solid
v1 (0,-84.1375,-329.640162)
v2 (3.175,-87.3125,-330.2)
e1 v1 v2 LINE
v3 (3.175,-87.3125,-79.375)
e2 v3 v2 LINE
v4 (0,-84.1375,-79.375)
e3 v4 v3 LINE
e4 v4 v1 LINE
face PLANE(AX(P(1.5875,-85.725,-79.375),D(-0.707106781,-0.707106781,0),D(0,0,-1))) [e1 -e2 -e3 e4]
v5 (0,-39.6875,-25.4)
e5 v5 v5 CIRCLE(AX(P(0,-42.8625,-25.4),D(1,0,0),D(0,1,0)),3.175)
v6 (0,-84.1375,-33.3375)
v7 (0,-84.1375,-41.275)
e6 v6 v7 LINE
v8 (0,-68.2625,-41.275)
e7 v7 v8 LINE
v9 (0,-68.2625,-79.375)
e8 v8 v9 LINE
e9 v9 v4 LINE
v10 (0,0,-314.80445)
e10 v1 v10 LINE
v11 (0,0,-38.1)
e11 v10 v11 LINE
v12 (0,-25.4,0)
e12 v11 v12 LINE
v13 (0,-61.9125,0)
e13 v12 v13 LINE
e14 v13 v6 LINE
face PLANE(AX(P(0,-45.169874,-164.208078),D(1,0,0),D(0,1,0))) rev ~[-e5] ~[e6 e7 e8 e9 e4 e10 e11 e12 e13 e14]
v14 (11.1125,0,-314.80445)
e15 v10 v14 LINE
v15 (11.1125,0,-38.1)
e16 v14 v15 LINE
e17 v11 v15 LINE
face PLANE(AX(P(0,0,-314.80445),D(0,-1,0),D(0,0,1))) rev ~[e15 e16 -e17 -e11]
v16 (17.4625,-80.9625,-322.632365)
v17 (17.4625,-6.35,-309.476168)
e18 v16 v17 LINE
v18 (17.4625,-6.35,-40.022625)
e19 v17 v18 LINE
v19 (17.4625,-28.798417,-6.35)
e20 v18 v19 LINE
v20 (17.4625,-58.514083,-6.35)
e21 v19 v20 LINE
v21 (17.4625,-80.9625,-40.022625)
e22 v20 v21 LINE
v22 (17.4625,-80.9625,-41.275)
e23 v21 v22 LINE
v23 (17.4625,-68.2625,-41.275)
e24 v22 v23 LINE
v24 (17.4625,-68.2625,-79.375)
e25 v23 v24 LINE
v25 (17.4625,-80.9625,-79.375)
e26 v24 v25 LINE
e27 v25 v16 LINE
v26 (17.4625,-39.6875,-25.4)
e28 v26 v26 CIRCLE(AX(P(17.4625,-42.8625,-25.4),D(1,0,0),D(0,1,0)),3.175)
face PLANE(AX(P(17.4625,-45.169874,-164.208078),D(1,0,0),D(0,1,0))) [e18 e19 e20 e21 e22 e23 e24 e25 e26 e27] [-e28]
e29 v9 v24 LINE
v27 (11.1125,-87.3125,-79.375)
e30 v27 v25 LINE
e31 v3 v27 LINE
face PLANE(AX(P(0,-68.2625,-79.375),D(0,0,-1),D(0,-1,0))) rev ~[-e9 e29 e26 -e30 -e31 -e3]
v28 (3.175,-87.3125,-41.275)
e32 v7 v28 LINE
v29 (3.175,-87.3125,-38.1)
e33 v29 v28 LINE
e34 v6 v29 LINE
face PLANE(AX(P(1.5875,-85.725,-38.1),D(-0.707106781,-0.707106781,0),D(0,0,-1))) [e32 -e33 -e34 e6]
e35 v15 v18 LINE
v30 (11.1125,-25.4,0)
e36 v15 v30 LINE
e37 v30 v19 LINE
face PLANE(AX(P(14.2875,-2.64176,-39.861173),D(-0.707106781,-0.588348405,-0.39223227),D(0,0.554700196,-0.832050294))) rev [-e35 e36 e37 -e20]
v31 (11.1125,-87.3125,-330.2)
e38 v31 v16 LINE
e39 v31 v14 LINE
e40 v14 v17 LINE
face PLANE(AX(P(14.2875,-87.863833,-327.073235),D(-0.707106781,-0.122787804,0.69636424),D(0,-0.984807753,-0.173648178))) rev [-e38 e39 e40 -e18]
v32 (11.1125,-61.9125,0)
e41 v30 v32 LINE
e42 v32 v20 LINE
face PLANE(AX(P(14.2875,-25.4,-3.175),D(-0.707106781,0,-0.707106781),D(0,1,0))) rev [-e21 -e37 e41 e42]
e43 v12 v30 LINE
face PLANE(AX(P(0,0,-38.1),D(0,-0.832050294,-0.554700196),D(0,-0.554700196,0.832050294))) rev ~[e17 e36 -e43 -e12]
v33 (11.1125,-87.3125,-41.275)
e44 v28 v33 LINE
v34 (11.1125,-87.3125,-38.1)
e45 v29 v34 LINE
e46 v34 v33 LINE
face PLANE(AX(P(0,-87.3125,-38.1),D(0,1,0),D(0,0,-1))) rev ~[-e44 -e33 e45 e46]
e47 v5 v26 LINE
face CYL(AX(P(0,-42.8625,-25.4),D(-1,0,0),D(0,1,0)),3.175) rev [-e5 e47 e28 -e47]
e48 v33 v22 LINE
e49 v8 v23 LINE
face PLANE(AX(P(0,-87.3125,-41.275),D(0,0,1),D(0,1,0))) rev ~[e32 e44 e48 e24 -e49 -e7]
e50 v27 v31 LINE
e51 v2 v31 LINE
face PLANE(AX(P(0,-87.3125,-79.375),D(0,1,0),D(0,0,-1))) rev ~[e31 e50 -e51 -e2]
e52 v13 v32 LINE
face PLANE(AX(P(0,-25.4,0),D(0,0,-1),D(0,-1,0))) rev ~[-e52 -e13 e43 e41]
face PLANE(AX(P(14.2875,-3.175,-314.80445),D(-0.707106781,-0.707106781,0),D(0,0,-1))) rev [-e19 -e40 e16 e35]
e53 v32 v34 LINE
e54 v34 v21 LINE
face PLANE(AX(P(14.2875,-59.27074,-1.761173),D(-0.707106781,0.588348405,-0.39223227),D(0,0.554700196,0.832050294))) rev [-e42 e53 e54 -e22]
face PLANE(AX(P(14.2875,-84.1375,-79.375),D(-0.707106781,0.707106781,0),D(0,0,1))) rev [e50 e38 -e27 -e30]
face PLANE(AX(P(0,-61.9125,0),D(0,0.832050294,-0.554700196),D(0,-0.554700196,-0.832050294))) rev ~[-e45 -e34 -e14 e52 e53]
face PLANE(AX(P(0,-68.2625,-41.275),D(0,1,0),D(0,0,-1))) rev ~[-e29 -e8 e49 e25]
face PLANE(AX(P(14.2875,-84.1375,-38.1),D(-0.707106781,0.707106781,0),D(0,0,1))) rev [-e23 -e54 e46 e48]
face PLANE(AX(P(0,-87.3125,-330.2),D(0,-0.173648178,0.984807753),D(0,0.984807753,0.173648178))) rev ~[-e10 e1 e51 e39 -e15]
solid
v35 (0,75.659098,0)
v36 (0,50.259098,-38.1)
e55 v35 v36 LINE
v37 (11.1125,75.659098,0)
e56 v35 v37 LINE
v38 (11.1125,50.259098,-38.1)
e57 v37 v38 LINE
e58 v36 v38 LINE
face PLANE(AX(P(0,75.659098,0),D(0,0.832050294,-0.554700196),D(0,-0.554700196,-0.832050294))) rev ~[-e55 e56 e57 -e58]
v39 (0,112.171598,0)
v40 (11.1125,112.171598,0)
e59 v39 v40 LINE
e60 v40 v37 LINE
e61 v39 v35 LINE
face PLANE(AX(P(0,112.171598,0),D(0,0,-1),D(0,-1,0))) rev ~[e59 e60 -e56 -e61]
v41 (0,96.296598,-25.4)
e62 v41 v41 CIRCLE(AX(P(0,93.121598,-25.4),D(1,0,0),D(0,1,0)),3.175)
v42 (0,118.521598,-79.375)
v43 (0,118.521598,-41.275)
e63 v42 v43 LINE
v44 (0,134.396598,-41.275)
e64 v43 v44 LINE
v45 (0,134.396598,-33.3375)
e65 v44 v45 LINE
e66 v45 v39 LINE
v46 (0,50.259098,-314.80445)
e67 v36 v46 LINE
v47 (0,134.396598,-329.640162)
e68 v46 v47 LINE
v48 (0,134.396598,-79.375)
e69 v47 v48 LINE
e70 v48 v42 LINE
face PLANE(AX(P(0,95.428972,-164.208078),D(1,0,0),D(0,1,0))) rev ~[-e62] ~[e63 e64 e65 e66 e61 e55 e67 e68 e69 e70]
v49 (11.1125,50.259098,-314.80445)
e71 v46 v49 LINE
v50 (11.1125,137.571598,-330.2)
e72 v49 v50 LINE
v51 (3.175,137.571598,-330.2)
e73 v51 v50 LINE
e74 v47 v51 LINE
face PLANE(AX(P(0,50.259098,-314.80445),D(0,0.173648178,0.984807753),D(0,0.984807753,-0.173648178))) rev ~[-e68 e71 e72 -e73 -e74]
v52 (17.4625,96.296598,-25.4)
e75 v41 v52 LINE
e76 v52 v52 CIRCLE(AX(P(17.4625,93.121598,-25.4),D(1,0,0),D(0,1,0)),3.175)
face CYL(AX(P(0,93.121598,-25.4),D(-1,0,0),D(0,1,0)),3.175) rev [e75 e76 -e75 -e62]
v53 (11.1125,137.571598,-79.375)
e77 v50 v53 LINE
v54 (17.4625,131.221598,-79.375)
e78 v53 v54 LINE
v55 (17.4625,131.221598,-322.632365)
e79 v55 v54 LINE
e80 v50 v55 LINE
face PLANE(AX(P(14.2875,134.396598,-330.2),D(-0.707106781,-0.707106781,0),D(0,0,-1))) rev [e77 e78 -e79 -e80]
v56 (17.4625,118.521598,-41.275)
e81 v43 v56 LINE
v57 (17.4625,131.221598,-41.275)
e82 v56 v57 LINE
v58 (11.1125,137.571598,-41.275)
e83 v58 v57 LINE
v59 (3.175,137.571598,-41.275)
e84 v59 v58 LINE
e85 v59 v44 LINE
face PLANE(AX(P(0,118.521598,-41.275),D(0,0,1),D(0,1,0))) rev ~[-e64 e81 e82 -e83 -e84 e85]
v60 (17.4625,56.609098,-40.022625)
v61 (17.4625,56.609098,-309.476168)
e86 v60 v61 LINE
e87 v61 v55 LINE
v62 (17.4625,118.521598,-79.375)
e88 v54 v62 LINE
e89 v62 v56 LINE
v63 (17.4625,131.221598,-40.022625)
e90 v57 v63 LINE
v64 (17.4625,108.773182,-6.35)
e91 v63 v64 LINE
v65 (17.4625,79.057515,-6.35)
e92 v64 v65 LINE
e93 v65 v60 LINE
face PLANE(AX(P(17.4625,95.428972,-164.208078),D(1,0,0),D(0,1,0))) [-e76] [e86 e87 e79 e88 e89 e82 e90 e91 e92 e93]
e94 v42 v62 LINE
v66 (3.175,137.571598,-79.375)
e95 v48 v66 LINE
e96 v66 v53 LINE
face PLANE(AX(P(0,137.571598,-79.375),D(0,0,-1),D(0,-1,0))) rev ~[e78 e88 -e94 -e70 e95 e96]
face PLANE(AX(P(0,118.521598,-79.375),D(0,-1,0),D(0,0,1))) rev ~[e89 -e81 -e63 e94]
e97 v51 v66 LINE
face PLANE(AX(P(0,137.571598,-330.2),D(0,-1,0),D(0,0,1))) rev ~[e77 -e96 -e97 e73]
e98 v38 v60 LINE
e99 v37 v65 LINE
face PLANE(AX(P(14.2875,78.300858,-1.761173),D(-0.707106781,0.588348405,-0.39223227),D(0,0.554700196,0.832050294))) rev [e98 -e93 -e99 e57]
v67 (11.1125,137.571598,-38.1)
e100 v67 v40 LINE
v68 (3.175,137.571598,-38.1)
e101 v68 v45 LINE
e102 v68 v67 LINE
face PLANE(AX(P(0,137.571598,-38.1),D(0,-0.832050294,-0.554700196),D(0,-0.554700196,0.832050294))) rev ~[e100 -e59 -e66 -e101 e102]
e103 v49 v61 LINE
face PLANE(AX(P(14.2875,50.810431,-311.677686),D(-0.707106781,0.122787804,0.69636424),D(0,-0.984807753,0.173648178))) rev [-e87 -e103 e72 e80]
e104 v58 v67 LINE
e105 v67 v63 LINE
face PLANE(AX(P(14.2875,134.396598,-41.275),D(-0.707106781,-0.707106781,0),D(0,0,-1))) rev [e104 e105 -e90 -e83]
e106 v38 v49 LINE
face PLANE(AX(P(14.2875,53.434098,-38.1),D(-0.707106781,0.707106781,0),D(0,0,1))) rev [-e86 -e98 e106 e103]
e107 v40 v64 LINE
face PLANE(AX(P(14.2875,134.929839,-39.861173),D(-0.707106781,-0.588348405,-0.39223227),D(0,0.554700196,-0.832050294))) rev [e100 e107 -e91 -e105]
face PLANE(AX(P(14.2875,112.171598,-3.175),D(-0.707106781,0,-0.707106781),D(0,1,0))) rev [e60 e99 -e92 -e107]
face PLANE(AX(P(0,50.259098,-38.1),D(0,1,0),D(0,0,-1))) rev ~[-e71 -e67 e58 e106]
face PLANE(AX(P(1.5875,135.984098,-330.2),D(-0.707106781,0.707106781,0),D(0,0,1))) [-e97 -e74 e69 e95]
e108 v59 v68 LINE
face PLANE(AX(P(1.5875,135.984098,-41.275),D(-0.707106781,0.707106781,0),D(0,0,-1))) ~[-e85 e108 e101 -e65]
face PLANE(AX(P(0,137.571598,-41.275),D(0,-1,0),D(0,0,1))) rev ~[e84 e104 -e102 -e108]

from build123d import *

# Parameters (mm, degrees)
F0_R      = 3.175
F1_DEPTH  = 17.4625
F2_SIZE   = 6.35
F2_2_SIZE = 6.35
F3_SIZE   = 3.175
F3_2_SIZE = 3.175


# Not quite as in the source:
# - a feature names something its author has since deleted; it is built from what else it names


with BuildPart() as f1:
    # F0 (on Right) → F1 (new body)
    with BuildSketch(Plane.YZ):
        Polygon((0, -314.8044504969), (0, -38.1), (-25.4, 0), (-61.9125, 0), (-87.3125, -38.1), (-87.3125, -41.275), (-68.2625, -41.275), (-68.2625, -79.375), (-87.3125, -79.375), (-87.3125, -330.2), align=None)
        with Locations((-42.8625, -25.4)):
            Circle(F0_R, mode=Mode.SUBTRACT)
    extrude(amount=F1_DEPTH)

    # F2
    f2_edges = [f1.edges().sort_by_distance(p)[0] for p in [
        (17.4625, -74.6125, -19.05),
        (17.4625, -43.65625, 0),
        (17.4625, -12.7, -19.05),
        (17.4625, 0, -176.452225),
        (17.4625, -87.3125, -39.6875),
        (17.4625, -43.65625, -322.502225),
        (17.4625, -87.3125, -204.7875),
    ]]
    chamfer(f2_edges, length=F2_SIZE)

    # F3#2
    f3_2_edges = [f1.edges().sort_by_distance(p)[0] for p in [
        (0, -87.3125, -39.6875),
        (0, -87.3125, -204.7875),
    ]]
    chamfer(f3_2_edges, length=F3_2_SIZE)


with BuildPart() as f1b:
    # F0 (on Right) → F1, piece 2 (new body)
    with BuildSketch(Plane.YZ):
        Polygon((137.5715984106, -38.1), (112.1715984106, 0), (75.6590984106, 0), (50.2590984106, -38.1), (50.2590984106, -314.8044504969), (137.5715984106, -330.2), (137.5715984106, -79.375), (118.5215984106, -79.375), (118.5215984106, -41.275), (137.5715984106, -41.275), align=None)
        with Locations((93.1215984106, -25.4)):
            Circle(F0_R, mode=Mode.SUBTRACT)
    extrude(amount=F1_DEPTH)

    # F2#2
    f2_2_edges = [f1b.edges().sort_by_distance(p)[0] for p in [
        (17.4625, 93.915348, -322.502225),
        (17.4625, 50.259098, -176.452225),
        (17.4625, 124.871598, -19.05),
        (17.4625, 93.915348, 0),
        (17.4625, 62.959098, -19.05),
        (17.4625, 137.571598, -204.7875),
        (17.4625, 137.571598, -39.6875),
    ]]
    chamfer(f2_2_edges, length=F2_2_SIZE)

    # F3
    f3_edges = [f1b.edges().sort_by_distance(p)[0] for p in [
        (0, 137.571598, -204.7875),
        (0, 137.571598, -39.6875),
    ]]
    chamfer(f3_edges, length=F3_SIZE)


solid = Compound([f1.part, f1b.part])
